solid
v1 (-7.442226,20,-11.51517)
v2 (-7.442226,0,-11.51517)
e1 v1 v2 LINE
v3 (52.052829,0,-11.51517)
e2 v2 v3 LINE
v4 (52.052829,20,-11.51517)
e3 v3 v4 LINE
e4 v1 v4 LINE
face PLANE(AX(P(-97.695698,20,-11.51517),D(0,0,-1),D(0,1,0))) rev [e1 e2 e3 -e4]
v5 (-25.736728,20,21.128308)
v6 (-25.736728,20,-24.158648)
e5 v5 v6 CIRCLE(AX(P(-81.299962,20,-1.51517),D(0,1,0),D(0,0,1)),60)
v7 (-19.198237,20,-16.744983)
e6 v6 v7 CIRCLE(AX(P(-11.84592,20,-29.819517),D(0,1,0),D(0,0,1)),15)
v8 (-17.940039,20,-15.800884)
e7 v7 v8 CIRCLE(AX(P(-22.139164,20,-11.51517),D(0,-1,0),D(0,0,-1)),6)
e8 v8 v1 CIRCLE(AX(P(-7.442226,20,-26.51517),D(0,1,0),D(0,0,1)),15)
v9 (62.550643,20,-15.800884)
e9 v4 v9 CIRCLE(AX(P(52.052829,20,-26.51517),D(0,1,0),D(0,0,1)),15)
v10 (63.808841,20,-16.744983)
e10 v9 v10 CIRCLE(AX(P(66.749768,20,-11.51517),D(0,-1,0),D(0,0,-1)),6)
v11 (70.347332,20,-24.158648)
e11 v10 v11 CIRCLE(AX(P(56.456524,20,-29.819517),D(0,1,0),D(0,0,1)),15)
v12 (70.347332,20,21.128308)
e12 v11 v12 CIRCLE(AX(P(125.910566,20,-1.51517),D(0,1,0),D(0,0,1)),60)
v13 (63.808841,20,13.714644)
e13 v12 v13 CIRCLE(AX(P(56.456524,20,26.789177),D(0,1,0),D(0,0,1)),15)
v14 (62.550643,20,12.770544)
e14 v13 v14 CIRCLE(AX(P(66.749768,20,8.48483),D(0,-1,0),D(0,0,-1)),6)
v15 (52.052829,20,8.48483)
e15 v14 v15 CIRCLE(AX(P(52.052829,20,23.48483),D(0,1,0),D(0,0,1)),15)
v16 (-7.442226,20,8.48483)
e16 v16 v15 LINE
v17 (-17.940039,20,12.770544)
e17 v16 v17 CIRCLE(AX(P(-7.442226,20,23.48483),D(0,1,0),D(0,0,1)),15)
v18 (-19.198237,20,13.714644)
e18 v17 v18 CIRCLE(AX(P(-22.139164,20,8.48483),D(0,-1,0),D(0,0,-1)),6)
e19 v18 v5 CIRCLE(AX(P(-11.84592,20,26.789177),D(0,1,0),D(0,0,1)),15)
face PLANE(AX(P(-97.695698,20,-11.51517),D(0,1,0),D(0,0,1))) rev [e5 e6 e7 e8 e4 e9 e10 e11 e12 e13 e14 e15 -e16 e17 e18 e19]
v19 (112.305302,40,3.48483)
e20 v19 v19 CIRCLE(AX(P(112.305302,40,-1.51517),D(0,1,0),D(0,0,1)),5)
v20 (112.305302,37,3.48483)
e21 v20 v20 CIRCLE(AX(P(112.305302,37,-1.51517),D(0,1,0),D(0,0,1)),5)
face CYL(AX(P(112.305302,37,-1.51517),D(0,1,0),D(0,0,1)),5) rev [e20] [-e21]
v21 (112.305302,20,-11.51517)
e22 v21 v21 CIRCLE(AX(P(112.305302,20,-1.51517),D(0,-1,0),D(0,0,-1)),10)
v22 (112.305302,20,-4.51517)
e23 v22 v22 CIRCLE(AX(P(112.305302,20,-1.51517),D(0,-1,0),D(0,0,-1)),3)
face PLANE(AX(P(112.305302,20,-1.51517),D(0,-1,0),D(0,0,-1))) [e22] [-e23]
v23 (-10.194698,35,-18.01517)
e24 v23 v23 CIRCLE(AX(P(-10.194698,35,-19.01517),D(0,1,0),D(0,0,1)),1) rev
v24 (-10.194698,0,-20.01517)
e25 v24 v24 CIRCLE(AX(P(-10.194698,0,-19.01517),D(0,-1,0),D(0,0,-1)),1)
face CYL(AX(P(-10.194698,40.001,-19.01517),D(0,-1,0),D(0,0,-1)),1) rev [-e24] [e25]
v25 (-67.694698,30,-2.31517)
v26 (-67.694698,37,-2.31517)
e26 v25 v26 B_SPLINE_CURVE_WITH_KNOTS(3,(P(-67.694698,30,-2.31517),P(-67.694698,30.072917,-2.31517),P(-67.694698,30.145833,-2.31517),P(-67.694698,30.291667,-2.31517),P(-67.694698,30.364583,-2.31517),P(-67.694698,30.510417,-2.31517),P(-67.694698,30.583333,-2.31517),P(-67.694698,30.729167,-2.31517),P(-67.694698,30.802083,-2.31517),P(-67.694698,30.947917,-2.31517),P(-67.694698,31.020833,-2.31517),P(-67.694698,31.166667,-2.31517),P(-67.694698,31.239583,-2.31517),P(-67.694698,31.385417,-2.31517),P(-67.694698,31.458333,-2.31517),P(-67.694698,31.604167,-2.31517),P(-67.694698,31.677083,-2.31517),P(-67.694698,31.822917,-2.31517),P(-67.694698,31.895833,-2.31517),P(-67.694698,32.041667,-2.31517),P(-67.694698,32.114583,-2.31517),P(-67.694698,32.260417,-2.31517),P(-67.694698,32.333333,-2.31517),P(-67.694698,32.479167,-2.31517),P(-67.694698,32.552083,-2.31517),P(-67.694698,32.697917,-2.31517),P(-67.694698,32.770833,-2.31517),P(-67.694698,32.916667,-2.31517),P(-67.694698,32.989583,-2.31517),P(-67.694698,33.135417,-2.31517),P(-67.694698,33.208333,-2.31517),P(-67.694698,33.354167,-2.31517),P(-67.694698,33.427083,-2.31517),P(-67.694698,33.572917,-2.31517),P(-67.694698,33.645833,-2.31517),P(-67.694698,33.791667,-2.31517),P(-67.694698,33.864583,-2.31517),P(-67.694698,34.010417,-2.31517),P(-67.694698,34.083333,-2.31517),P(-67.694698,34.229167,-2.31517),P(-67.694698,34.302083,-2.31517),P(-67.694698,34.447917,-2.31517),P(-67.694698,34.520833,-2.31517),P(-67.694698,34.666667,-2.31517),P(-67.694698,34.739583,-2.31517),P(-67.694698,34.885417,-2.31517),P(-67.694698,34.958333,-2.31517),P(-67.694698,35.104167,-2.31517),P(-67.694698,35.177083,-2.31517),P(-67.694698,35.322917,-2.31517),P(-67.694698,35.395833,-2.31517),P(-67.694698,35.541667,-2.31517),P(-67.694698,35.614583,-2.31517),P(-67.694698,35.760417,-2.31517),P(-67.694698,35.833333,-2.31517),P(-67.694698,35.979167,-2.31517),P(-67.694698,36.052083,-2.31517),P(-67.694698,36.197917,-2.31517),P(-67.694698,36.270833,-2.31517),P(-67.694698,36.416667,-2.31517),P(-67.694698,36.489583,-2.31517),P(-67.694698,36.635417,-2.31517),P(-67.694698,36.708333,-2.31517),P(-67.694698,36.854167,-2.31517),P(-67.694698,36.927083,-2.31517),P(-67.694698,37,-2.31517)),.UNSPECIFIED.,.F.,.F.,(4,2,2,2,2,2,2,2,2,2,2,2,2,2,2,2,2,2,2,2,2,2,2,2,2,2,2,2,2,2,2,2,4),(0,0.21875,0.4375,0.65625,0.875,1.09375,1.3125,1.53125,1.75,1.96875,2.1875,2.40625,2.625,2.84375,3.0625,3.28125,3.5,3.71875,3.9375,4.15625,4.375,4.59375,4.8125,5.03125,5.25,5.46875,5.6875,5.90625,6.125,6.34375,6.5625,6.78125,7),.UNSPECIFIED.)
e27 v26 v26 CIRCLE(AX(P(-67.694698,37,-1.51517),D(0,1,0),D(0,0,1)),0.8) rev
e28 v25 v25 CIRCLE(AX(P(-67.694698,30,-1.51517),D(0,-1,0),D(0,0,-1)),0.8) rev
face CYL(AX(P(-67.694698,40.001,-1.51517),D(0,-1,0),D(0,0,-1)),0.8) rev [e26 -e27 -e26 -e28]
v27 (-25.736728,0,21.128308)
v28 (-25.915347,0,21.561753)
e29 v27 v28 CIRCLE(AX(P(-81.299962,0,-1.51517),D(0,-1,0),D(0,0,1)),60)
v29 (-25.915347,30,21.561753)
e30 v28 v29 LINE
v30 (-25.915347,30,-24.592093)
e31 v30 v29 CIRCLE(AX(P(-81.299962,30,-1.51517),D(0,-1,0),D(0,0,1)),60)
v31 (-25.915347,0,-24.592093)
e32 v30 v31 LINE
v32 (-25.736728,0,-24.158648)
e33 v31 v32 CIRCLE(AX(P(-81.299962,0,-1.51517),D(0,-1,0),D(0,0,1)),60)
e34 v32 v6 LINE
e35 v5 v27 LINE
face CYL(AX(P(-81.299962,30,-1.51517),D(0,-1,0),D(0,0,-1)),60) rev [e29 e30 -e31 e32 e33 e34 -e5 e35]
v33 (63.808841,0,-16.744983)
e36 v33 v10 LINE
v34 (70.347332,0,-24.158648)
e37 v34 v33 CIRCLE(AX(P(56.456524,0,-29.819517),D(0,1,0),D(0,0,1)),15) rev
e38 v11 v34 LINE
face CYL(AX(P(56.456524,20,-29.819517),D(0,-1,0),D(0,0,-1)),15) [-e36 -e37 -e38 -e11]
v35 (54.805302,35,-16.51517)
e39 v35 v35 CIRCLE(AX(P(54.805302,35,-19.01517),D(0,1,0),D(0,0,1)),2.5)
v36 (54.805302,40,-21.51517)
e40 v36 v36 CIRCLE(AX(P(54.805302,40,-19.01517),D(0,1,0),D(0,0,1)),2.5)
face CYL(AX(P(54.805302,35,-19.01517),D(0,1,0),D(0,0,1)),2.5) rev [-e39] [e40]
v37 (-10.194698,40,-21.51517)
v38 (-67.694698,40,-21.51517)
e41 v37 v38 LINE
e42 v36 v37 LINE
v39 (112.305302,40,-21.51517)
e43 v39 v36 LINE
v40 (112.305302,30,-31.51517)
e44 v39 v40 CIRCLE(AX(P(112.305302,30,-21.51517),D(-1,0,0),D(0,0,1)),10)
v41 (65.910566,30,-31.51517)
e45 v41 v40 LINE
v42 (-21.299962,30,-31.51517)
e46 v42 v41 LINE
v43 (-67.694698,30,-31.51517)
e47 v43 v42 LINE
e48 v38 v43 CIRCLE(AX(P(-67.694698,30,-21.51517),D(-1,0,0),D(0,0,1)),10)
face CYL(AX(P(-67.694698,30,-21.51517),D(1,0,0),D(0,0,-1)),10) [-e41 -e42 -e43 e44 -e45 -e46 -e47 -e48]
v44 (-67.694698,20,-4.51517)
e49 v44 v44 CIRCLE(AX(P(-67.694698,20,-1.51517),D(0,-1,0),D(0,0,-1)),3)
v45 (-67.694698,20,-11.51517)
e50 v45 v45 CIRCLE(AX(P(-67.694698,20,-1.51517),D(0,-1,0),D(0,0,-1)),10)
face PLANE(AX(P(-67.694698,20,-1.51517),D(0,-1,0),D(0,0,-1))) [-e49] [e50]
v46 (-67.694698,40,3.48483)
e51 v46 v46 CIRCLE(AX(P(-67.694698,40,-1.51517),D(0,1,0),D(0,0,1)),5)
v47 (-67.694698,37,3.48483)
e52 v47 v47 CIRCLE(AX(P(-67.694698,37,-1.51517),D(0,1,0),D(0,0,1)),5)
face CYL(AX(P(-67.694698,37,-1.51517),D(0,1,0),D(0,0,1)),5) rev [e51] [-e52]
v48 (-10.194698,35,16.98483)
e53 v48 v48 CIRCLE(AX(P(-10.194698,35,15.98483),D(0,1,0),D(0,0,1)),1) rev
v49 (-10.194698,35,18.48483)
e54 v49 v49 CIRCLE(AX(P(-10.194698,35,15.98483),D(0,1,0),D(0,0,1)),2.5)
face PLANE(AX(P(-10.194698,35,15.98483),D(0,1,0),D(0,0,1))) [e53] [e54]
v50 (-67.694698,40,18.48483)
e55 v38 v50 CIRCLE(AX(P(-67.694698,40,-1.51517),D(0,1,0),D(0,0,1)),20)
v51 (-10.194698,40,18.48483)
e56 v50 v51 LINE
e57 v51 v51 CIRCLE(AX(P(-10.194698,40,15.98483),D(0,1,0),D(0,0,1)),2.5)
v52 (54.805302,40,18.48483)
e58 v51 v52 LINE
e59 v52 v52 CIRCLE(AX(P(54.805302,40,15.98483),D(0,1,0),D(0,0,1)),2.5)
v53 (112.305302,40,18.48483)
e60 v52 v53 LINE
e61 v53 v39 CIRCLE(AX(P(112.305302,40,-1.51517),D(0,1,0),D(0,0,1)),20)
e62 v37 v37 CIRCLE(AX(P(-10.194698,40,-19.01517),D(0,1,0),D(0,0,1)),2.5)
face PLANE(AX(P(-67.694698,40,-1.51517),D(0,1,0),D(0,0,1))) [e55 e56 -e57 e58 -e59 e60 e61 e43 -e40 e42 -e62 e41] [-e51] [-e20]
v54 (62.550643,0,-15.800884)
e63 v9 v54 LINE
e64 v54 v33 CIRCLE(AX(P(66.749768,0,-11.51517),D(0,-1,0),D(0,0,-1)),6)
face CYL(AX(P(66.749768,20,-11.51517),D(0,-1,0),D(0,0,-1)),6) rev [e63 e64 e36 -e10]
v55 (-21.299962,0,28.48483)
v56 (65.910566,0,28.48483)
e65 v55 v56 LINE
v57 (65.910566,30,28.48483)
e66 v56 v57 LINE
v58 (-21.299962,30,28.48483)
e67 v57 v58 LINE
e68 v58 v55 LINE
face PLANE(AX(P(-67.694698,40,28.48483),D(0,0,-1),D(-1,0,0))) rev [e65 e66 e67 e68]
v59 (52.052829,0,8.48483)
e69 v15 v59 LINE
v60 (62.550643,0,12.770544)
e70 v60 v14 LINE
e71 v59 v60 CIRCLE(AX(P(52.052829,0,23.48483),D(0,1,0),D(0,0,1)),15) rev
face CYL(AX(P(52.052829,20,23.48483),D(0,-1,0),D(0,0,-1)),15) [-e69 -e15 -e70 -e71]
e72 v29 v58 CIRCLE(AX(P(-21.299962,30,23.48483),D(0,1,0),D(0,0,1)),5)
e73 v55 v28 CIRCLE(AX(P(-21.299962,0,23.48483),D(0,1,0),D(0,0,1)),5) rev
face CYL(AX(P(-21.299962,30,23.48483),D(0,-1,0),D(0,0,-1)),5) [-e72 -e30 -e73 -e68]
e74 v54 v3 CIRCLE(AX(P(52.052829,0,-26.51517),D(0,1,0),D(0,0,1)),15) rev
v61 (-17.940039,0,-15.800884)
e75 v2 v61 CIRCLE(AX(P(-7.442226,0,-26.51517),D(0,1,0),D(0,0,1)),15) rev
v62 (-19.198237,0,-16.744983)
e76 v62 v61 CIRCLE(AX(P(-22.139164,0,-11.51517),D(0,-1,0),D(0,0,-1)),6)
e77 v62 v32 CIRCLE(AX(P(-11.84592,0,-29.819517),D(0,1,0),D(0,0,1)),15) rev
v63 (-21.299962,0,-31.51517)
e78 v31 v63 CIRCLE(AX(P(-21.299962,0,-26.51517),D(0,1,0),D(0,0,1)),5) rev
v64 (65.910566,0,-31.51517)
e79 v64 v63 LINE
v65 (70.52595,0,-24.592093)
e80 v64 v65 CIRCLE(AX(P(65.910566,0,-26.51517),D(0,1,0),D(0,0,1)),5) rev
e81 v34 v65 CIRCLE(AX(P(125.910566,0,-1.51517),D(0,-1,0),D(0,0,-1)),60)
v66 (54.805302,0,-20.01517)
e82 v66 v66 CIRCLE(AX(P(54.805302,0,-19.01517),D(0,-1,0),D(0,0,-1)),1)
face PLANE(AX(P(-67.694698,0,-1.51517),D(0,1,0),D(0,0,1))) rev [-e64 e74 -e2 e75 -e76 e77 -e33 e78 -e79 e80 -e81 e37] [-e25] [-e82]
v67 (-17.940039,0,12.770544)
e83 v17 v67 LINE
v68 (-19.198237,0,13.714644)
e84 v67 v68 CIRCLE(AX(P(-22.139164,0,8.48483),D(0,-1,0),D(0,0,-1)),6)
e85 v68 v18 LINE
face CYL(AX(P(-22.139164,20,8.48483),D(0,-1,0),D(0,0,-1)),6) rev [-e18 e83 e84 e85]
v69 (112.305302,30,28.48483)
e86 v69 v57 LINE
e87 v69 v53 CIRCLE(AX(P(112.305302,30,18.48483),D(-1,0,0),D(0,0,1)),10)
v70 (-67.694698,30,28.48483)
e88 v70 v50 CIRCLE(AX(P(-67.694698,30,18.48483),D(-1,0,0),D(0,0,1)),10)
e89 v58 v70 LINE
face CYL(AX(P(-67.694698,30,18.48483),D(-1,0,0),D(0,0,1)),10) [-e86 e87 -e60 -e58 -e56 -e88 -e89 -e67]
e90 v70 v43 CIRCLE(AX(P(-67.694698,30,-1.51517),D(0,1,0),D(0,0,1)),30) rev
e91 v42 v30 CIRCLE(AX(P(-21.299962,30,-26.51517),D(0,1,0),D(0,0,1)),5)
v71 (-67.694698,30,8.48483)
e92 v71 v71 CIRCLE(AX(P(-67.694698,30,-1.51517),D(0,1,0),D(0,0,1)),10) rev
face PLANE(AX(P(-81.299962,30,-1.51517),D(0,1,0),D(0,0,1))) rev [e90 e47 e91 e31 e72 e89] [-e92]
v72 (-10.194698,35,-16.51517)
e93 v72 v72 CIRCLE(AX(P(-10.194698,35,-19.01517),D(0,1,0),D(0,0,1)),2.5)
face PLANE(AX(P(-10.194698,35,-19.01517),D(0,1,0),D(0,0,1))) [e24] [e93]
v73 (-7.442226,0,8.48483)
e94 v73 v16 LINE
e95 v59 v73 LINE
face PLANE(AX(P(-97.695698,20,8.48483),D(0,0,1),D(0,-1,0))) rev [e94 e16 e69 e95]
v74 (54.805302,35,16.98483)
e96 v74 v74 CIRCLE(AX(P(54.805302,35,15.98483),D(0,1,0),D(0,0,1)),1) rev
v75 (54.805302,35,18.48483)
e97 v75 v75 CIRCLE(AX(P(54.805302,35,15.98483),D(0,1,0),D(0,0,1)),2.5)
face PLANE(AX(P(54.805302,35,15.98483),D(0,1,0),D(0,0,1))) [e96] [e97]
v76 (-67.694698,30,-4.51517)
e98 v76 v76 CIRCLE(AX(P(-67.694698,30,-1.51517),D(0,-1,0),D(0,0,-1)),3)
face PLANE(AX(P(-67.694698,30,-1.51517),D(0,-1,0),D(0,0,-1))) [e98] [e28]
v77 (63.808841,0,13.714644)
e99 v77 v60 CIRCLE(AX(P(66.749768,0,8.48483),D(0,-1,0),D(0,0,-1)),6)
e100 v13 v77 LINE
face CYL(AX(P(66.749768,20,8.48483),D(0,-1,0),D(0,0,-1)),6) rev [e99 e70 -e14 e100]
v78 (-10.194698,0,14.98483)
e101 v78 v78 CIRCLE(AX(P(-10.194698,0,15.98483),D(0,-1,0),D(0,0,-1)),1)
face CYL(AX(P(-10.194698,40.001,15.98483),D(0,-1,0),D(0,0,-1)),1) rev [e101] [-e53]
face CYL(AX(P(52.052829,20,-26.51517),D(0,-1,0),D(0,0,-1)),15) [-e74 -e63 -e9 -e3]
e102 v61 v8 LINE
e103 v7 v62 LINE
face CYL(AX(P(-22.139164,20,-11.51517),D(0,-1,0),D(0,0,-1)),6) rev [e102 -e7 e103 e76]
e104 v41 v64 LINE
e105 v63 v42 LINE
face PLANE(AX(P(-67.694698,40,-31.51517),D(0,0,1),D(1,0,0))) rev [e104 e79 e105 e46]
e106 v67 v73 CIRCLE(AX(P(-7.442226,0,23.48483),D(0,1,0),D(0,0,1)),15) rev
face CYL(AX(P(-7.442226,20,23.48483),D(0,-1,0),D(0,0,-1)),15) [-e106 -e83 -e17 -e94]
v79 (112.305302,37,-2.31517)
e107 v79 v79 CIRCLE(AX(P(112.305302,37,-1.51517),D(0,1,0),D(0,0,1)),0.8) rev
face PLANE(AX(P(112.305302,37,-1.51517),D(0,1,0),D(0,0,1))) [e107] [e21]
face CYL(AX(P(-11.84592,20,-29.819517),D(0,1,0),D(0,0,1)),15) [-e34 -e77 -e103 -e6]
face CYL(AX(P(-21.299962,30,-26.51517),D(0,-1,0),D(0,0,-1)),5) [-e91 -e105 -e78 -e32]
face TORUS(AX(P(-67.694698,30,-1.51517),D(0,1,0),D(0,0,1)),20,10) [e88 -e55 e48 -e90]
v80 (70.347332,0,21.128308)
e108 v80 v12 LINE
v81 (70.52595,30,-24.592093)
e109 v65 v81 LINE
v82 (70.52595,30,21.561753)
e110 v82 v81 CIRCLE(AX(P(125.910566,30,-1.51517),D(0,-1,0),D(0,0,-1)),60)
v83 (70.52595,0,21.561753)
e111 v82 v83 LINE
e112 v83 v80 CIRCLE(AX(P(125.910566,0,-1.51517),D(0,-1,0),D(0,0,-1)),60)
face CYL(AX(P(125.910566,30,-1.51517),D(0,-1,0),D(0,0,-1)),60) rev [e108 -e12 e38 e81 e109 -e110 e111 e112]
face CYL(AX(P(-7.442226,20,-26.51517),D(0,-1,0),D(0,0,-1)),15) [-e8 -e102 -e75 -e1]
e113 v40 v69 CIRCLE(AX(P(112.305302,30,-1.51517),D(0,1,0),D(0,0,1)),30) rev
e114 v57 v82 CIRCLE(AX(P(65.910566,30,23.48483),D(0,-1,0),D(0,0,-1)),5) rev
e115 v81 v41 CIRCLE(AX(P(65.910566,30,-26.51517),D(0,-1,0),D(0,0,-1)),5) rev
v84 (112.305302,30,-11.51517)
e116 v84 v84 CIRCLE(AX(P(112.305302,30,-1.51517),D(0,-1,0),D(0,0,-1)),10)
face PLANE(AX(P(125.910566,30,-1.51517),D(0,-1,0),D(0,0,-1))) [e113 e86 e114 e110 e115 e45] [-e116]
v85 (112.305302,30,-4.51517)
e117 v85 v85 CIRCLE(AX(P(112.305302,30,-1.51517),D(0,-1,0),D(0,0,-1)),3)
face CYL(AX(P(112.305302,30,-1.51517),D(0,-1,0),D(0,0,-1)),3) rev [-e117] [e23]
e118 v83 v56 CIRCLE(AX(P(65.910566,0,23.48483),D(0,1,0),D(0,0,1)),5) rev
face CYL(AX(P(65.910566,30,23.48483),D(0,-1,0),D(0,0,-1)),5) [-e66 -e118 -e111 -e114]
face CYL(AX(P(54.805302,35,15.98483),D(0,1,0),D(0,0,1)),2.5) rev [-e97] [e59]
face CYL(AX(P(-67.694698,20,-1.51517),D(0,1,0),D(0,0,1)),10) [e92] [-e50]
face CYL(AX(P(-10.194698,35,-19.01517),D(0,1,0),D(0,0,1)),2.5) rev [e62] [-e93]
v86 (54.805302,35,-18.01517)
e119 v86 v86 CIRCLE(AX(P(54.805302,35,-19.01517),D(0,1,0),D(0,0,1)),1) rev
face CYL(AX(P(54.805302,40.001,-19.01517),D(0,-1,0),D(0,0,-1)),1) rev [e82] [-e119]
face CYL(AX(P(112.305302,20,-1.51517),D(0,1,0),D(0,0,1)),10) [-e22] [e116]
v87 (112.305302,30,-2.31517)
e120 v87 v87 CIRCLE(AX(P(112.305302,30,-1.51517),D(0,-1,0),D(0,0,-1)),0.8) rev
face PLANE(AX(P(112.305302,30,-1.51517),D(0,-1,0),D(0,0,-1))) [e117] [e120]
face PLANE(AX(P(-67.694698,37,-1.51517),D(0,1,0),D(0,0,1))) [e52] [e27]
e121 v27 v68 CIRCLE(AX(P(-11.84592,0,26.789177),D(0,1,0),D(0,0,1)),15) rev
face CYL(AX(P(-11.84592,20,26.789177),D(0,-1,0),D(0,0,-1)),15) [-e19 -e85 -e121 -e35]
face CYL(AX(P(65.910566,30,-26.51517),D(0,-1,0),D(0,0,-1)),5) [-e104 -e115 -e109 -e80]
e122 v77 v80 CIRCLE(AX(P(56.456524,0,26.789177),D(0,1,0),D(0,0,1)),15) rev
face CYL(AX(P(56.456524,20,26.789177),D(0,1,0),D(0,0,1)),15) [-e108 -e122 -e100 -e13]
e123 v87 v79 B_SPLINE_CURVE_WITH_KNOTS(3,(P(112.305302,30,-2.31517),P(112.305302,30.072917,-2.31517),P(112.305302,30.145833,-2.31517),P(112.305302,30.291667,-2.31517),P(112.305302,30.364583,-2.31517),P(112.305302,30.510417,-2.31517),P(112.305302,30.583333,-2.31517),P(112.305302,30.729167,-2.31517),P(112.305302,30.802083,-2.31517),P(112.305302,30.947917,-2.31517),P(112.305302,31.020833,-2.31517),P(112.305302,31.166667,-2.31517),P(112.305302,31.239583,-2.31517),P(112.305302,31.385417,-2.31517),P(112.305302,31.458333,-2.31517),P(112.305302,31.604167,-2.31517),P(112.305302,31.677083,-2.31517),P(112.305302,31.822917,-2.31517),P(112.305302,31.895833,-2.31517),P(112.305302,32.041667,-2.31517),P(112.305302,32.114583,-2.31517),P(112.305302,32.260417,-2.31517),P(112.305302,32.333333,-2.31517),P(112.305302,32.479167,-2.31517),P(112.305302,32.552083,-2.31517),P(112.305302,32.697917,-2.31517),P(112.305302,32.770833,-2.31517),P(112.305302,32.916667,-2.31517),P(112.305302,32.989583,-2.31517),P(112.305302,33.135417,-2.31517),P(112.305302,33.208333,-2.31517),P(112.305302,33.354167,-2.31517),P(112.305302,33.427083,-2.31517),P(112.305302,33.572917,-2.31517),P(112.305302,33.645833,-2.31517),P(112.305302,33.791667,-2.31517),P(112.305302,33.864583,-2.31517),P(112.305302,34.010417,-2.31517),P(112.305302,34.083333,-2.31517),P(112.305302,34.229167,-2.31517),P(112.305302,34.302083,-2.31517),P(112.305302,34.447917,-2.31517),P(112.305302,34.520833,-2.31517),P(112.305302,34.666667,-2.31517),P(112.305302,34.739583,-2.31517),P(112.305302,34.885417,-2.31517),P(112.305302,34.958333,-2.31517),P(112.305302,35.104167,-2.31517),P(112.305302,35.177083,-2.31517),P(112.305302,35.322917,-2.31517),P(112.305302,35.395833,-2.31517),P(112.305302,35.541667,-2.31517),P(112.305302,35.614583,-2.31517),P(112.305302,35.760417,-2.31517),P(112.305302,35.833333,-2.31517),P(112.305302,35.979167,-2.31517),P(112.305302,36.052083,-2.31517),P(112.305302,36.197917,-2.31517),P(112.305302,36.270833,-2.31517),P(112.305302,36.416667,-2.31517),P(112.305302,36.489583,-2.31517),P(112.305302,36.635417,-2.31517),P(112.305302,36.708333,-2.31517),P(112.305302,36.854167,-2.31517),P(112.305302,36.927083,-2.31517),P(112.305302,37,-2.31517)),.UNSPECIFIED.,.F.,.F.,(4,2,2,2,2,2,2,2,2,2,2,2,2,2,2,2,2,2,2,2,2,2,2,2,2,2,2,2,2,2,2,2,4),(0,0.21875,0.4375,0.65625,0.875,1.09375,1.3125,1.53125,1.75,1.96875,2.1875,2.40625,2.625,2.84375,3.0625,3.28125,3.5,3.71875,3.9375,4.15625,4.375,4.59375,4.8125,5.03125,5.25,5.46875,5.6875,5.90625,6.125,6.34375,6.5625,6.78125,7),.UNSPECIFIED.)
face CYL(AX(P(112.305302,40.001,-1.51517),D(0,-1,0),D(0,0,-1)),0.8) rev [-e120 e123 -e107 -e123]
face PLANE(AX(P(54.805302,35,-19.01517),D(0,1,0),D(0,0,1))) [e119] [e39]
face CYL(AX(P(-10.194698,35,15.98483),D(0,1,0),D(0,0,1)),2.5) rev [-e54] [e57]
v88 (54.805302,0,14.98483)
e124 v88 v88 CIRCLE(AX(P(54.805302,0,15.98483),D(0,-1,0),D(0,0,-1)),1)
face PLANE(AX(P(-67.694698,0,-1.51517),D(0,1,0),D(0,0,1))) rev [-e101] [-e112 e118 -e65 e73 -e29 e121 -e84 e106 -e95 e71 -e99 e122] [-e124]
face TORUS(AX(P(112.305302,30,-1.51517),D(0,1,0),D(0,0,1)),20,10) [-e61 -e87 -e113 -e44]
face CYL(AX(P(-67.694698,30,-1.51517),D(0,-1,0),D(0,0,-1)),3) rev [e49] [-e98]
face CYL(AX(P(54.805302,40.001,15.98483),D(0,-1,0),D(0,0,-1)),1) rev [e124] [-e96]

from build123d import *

# Parameters (mm, degrees)
BOSS_EXTRUDE1_DEPTH     = 40
FILLET1_R               = 10
CUT_EXTRUDE1_DEPTH      = 30
SKETCH4_R               = 10
BOSS_EXTRUDE3_DEPTH     = 10
CUT_EXTRUDE2_REACH      = 181.038
CUT_EXTRUDE2_END_RADIUS = 60
SKETCH5_W               = 20
SKETCH5_H               = 40
FILLET2_R               = 5
CUT_EXTRUDE3_REACH      = 153.142
SKETCH6_R               = 1
SKETCH7_R               = 2.5
CUT_EXTRUDE4_DEPTH      = 5
CUT_EXTRUDE5_REACH      = 149.119
SKETCH8_R               = 0.8
SKETCH9_R               = 3
CUT_EXTRUDE6_DEPTH      = 10
SKETCH11_R              = 5
CUT_EXTRUDE7_DEPTH      = 3
SKETCH12_R              = 6
CUT_EXTRUDE8_DEPTH      = 20
FILLET3_R               = 15


with BuildPart() as part:
    # Sketch1 → Boss-Extrude1 (new body)
    with BuildSketch(Plane(origin=(0, 0, 0), x_dir=(1, 0, 0), z_dir=(0, 1, 0))):
        with BuildLine():
            Line((-67.694698117, 31.515169882), (112.305301883, 31.515169882))
            ThreePointArc((112.305301883, 31.515169882), (142.305301883, 1.515169882), (112.305301883, -28.484830118))
            Line((112.305301883, -28.484830118), (-67.694698117, -28.484830118))
            ThreePointArc((-67.694698117, -28.484830118), (-97.694698117, 1.515169882), (-67.694698117, 31.515169882))
        make_face()
    extrude(amount=BOSS_EXTRUDE1_DEPTH)

    # Fillet1
    fillet1_edges = [part.edges().sort_by_distance(p)[0] for p in [
        (142.305301883, 40, -1.515169882),
        (22.305301883, 40, -31.515169882),
        (-97.694698117, 40, -1.515169882),
        (22.305301883, 40, 28.484830118),
    ]]
    fillet(fillet1_edges, radius=FILLET1_R)

    # Sketch3 → Cut-Extrude1 (cut)
    with BuildSketch(Plane.XZ):
        with BuildLine():
            Line((73.949041486, -31.515169882), (148.949041486, -31.515169882))
            Line((148.949041486, -31.515169882), (148.949041486, 28.484830118))
            Line((148.949041486, 28.484830118), (73.949041486, 28.484830118))
            ThreePointArc((73.949041486, 28.484830118), (65.910565713, -1.515169882), (73.949041486, -31.515169882))
        make_face()
        with BuildLine():
            Line((-29.33843772, 28.484830118), (-104.33843772, 28.484830118))
            Line((-104.33843772, 28.484830118), (-104.33843772, -31.515169882))
            Line((-104.33843772, -31.515169882), (-29.33843772, -31.515169882))
            ThreePointArc((-29.33843772, -31.515169882), (-21.299961947, -1.515169882), (-29.33843772, 28.484830118))
        make_face()
    extrude(amount=-CUT_EXTRUDE1_DEPTH, mode=Mode.SUBTRACT)

    # Sketch4 → Boss-Extrude3 (add)
    with BuildSketch(Plane(origin=(0, 30, 0), x_dir=(-1, 0, 0), z_dir=(0, -1, 0))):
        with Locations(Location((-112.305301883, 1.515169882, 0), (0, 0, 90))):
            Circle(SKETCH4_R)
        with Locations(Location((67.694698117, 1.515169882, 0), (0, 0, 270))):
            Circle(SKETCH4_R)
    extrude(amount=BOSS_EXTRUDE3_DEPTH)

    # Cut-Extrude2: up to this cylinder (the profile starts outside it)
    cut_extrude2_end = Plane(origin=(-81.299961947, 0, -1.515169882), z_dir=(0, -1, 0)) * Cylinder(CUT_EXTRUDE2_END_RADIUS, 483.076, mode=Mode.PRIVATE)
    # Sketch5 → Cut-Extrude2 (cut, up to the surface)
    with BuildSketch(Plane(origin=(73.949041486, 0, 0), x_dir=(0, 0, -1), z_dir=(1, 0, 0)), mode=Mode.PRIVATE) as cut_extrude2_sk1:
        with Locations((1.515169882, 0)):
            Rectangle(SKETCH5_W, SKETCH5_H)
    cut_extrude2_tool1 = extrude(cut_extrude2_sk1.sketch, amount=-CUT_EXTRUDE2_REACH, mode=Mode.PRIVATE) - cut_extrude2_end
    add(cut_extrude2_tool1.solids().sort_by_distance((73.949041, 0, -1.51517))[0], mode=Mode.SUBTRACT)

    # Fillet2
    # the kernel refuses this fillet: 5 mm, written as the material it takes off along each edge
    with BuildSketch(Plane(origin=(-29.33843772, -20.096189432, 28.484830118), x_dir=(0.44322659401027775, 0, -0.8964096085841831), z_dir=(0, 1, 0))) as fillet2_piece_1:
        with BuildLine():
            CenterArc((8.044914281, -4.989633951), FILLET2_R, 93.690067526, 112.619864948)
            Line((3.562866238, -7.205766921), (0, 0))
            ThreePointArc((0, 0), (3.861558855, -0.124392586), (7.72311771, 0))
        make_face()
    extrude(amount=50.096189432, mode=Mode.SUBTRACT)
    with BuildSketch(Plane(origin=(-29.33843772, -20.096189432, -31.515169882), x_dir=(1, 0, 0), z_dir=(0, 1, 0))) as fillet2_piece_2:
        with BuildLine():
            CenterArc((8.038475773, -5), FILLET2_R, 90, 112.619864948)
            ThreePointArc((3.423091158, -6.923076923), (1.823052288, -3.406404359), (0, 0))
            Line((0, 0), (8.038475773, 0))
        make_face()
    extrude(amount=50.096189432, mode=Mode.SUBTRACT)
    with BuildSketch(Plane(origin=(73.949041486, -20.096189432, -31.515169882), x_dir=(-1, 0, 0), z_dir=(0, 1, 0))) as fillet2_piece_3:
        with BuildLine():
            CenterArc((8.038475773, 5), FILLET2_R, 157.380135052, 112.619864948)
            ThreePointArc((3.423091158, 6.923076923), (1.823052288, 3.406404359), (0, 0))
            Line((0, 0), (8.038475773, 0))
        make_face()
    extrude(amount=50.096189432, mode=Mode.SUBTRACT)
    with BuildSketch(Plane(origin=(73.949041486, -20.096189432, 28.484830118), x_dir=(-0.4432265940102763, 0, -0.8964096085841838), z_dir=(0, 1, 0))) as fillet2_piece_4:
        with BuildLine():
            CenterArc((8.044914281, 4.989633951), FILLET2_R, 153.690067526, 112.619864948)
            Line((3.562866238, 7.205766921), (0, 0))
            ThreePointArc((0, 0), (3.861558855, 0.124392586), (7.72311771, 0))
        make_face()
    extrude(amount=50.096189432, mode=Mode.SUBTRACT)

    # Sketch6 → Cut-Extrude3 (cut, up to next)
    with BuildSketch(Plane(origin=(0, 0, 0), x_dir=(-1, 0, 0), z_dir=(0, -1, 0)), mode=Mode.PRIVATE) as cut_extrude3_sk1:
        with Locations(Location((10.194698117, -15.984830118, 0), (0, 0, 90))):
            Circle(SKETCH6_R)
    cut_extrude3_tool1 = extrude(cut_extrude3_sk1.sketch, amount=-CUT_EXTRUDE3_REACH, mode=Mode.PRIVATE) & part.part
    # Sketch6 → Cut-Extrude3 (cut, up to next)
    with BuildSketch(Plane(origin=(0, 0, 0), x_dir=(-1, 0, 0), z_dir=(0, -1, 0)), mode=Mode.PRIVATE) as cut_extrude3_sk2:
        with Locations(Location((-54.805301883, -15.984830118, 0), (0, 0, 90))):
            Circle(SKETCH6_R)
    cut_extrude3_tool2 = extrude(cut_extrude3_sk2.sketch, amount=-CUT_EXTRUDE3_REACH, mode=Mode.PRIVATE) & part.part
    # Sketch6 → Cut-Extrude3 (cut, up to next)
    with BuildSketch(Plane(origin=(0, 0, 0), x_dir=(-1, 0, 0), z_dir=(0, -1, 0)), mode=Mode.PRIVATE) as cut_extrude3_sk3:
        with Locations(Location((-54.805301883, 19.015169882, 0), (0, 0, 90))):
            Circle(SKETCH6_R)
    cut_extrude3_tool3 = extrude(cut_extrude3_sk3.sketch, amount=-CUT_EXTRUDE3_REACH, mode=Mode.PRIVATE) & part.part
    # Sketch6 → Cut-Extrude3 (cut, up to next)
    with BuildSketch(Plane(origin=(0, 0, 0), x_dir=(-1, 0, 0), z_dir=(0, -1, 0)), mode=Mode.PRIVATE) as cut_extrude3_sk4:
        with Locations(Location((10.194698117, 19.015169882, 0), (0, 0, 90))):
            Circle(SKETCH6_R)
    cut_extrude3_tool4 = extrude(cut_extrude3_sk4.sketch, amount=-CUT_EXTRUDE3_REACH, mode=Mode.PRIVATE) & part.part
    add(cut_extrude3_tool1.solids().sort_by_distance((-10.194698, 0, 15.98483))[0], mode=Mode.SUBTRACT)
    add(cut_extrude3_tool2.solids().sort_by_distance((54.805302, 0, 15.98483))[0], mode=Mode.SUBTRACT)
    add(cut_extrude3_tool3.solids().sort_by_distance((54.805302, 0, -19.01517))[0], mode=Mode.SUBTRACT)
    add(cut_extrude3_tool4.solids().sort_by_distance((-10.194698, 0, -19.01517))[0], mode=Mode.SUBTRACT)

    # Sketch7 → Cut-Extrude4 (cut)
    with BuildSketch(Plane(origin=(0, 40, 0), x_dir=(1, 0, 0), z_dir=(0, 1, 0))):
        with Locations(Location((-10.194698117, 19.015169882, 0), (0, 0, 270))):
            Circle(SKETCH7_R)
        with Locations(Location((-10.194698117, -15.984830118, 0), (0, 0, 270))):
            Circle(SKETCH7_R)
        with Locations(Location((54.805301883, -15.984830118, 0), (0, 0, 270))):
            Circle(SKETCH7_R)
        with Locations(Location((54.805301883, 19.015169882, 0), (0, 0, 270))):
            Circle(SKETCH7_R)
    extrude(amount=-CUT_EXTRUDE4_DEPTH, mode=Mode.SUBTRACT)

    # Sketch8 → Cut-Extrude5 (cut, up to next)
    with BuildSketch(Plane(origin=(0, 20, 0), x_dir=(-1, 0, 0), z_dir=(0, -1, 0)), mode=Mode.PRIVATE) as cut_extrude5_sk1:
        with Locations(Location((67.694698117, 1.515169882, 0), (0, 0, 90))):
            Circle(SKETCH8_R)
    cut_extrude5_tool1 = extrude(cut_extrude5_sk1.sketch, amount=-CUT_EXTRUDE5_REACH, mode=Mode.PRIVATE) & part.part
    # Sketch8 → Cut-Extrude5 (cut, up to next)
    with BuildSketch(Plane(origin=(0, 20, 0), x_dir=(-1, 0, 0), z_dir=(0, -1, 0)), mode=Mode.PRIVATE) as cut_extrude5_sk2:
        with Locations(Location((-112.305301883, 1.515169882, 0), (0, 0, 90))):
            Circle(SKETCH8_R)
    cut_extrude5_tool2 = extrude(cut_extrude5_sk2.sketch, amount=-CUT_EXTRUDE5_REACH, mode=Mode.PRIVATE) & part.part
    add(cut_extrude5_tool1.solids().sort_by_distance((-67.694698, 20, -1.51517))[0], mode=Mode.SUBTRACT)
    add(cut_extrude5_tool2.solids().sort_by_distance((112.305302, 20, -1.51517))[0], mode=Mode.SUBTRACT)

    # Sketch9 → Cut-Extrude6 (cut)
    with BuildSketch(Plane(origin=(0, 20, 0), x_dir=(-1, 0, 0), z_dir=(0, -1, 0))):
        with Locations(Location((67.694698117, 1.515169882, 0), (0, 0, 90))):
            Circle(SKETCH9_R)
        with Locations(Location((-112.305301883, 1.515169882, 0), (0, 0, 90))):
            Circle(SKETCH9_R)
    extrude(amount=-CUT_EXTRUDE6_DEPTH, mode=Mode.SUBTRACT)

    # Sketch11 → Cut-Extrude7 (cut)
    with BuildSketch(Plane(origin=(0, 40, 0), x_dir=(1, 0, 0), z_dir=(0, 1, 0))):
        with Locations(Location((-67.694698117, 1.515169882, 0), (0, 0, 270))):
            Circle(SKETCH11_R)
        with Locations(Location((112.305301883, 1.515169882, 0), (0, 0, 270))):
            Circle(SKETCH11_R)
    extrude(amount=-CUT_EXTRUDE7_DEPTH, mode=Mode.SUBTRACT)

    # Sketch12 → Cut-Extrude8 (cut)
    with BuildSketch(Plane(origin=(0, 0, 0), x_dir=(-1, 0, 0), z_dir=(0, -1, 0))):
        with Locations((22.139164116, -8.484830118)):
            Circle(SKETCH12_R)
        with Locations((22.139164116, 11.515169882)):
            Circle(SKETCH12_R)
        with Locations((-66.749767882, 11.515169882)):
            Circle(SKETCH12_R)
        with Locations((-66.749767882, -8.484830118)):
            Circle(SKETCH12_R)
    extrude(amount=-CUT_EXTRUDE8_DEPTH, mode=Mode.SUBTRACT)

    # Fillet3
    fillet3_edges = [part.edges().sort_by_distance(p)[0] for p in [
        (68.044321089, 10, 14.343510174),
        (60.749767882, 10, 8.484830118),
        (68.044321089, 10, -17.373849938),
        (60.749767882, 10, -11.515169882),
        (-23.433717323, 10, -17.373849938),
        (-16.139164116, 10, -11.515169882),
        (-23.433717323, 10, 14.343510174),
        (-16.139164116, 10, 8.484830118),
    ]]
    fillet(fillet3_edges, radius=FILLET3_R)


solid = part.part
